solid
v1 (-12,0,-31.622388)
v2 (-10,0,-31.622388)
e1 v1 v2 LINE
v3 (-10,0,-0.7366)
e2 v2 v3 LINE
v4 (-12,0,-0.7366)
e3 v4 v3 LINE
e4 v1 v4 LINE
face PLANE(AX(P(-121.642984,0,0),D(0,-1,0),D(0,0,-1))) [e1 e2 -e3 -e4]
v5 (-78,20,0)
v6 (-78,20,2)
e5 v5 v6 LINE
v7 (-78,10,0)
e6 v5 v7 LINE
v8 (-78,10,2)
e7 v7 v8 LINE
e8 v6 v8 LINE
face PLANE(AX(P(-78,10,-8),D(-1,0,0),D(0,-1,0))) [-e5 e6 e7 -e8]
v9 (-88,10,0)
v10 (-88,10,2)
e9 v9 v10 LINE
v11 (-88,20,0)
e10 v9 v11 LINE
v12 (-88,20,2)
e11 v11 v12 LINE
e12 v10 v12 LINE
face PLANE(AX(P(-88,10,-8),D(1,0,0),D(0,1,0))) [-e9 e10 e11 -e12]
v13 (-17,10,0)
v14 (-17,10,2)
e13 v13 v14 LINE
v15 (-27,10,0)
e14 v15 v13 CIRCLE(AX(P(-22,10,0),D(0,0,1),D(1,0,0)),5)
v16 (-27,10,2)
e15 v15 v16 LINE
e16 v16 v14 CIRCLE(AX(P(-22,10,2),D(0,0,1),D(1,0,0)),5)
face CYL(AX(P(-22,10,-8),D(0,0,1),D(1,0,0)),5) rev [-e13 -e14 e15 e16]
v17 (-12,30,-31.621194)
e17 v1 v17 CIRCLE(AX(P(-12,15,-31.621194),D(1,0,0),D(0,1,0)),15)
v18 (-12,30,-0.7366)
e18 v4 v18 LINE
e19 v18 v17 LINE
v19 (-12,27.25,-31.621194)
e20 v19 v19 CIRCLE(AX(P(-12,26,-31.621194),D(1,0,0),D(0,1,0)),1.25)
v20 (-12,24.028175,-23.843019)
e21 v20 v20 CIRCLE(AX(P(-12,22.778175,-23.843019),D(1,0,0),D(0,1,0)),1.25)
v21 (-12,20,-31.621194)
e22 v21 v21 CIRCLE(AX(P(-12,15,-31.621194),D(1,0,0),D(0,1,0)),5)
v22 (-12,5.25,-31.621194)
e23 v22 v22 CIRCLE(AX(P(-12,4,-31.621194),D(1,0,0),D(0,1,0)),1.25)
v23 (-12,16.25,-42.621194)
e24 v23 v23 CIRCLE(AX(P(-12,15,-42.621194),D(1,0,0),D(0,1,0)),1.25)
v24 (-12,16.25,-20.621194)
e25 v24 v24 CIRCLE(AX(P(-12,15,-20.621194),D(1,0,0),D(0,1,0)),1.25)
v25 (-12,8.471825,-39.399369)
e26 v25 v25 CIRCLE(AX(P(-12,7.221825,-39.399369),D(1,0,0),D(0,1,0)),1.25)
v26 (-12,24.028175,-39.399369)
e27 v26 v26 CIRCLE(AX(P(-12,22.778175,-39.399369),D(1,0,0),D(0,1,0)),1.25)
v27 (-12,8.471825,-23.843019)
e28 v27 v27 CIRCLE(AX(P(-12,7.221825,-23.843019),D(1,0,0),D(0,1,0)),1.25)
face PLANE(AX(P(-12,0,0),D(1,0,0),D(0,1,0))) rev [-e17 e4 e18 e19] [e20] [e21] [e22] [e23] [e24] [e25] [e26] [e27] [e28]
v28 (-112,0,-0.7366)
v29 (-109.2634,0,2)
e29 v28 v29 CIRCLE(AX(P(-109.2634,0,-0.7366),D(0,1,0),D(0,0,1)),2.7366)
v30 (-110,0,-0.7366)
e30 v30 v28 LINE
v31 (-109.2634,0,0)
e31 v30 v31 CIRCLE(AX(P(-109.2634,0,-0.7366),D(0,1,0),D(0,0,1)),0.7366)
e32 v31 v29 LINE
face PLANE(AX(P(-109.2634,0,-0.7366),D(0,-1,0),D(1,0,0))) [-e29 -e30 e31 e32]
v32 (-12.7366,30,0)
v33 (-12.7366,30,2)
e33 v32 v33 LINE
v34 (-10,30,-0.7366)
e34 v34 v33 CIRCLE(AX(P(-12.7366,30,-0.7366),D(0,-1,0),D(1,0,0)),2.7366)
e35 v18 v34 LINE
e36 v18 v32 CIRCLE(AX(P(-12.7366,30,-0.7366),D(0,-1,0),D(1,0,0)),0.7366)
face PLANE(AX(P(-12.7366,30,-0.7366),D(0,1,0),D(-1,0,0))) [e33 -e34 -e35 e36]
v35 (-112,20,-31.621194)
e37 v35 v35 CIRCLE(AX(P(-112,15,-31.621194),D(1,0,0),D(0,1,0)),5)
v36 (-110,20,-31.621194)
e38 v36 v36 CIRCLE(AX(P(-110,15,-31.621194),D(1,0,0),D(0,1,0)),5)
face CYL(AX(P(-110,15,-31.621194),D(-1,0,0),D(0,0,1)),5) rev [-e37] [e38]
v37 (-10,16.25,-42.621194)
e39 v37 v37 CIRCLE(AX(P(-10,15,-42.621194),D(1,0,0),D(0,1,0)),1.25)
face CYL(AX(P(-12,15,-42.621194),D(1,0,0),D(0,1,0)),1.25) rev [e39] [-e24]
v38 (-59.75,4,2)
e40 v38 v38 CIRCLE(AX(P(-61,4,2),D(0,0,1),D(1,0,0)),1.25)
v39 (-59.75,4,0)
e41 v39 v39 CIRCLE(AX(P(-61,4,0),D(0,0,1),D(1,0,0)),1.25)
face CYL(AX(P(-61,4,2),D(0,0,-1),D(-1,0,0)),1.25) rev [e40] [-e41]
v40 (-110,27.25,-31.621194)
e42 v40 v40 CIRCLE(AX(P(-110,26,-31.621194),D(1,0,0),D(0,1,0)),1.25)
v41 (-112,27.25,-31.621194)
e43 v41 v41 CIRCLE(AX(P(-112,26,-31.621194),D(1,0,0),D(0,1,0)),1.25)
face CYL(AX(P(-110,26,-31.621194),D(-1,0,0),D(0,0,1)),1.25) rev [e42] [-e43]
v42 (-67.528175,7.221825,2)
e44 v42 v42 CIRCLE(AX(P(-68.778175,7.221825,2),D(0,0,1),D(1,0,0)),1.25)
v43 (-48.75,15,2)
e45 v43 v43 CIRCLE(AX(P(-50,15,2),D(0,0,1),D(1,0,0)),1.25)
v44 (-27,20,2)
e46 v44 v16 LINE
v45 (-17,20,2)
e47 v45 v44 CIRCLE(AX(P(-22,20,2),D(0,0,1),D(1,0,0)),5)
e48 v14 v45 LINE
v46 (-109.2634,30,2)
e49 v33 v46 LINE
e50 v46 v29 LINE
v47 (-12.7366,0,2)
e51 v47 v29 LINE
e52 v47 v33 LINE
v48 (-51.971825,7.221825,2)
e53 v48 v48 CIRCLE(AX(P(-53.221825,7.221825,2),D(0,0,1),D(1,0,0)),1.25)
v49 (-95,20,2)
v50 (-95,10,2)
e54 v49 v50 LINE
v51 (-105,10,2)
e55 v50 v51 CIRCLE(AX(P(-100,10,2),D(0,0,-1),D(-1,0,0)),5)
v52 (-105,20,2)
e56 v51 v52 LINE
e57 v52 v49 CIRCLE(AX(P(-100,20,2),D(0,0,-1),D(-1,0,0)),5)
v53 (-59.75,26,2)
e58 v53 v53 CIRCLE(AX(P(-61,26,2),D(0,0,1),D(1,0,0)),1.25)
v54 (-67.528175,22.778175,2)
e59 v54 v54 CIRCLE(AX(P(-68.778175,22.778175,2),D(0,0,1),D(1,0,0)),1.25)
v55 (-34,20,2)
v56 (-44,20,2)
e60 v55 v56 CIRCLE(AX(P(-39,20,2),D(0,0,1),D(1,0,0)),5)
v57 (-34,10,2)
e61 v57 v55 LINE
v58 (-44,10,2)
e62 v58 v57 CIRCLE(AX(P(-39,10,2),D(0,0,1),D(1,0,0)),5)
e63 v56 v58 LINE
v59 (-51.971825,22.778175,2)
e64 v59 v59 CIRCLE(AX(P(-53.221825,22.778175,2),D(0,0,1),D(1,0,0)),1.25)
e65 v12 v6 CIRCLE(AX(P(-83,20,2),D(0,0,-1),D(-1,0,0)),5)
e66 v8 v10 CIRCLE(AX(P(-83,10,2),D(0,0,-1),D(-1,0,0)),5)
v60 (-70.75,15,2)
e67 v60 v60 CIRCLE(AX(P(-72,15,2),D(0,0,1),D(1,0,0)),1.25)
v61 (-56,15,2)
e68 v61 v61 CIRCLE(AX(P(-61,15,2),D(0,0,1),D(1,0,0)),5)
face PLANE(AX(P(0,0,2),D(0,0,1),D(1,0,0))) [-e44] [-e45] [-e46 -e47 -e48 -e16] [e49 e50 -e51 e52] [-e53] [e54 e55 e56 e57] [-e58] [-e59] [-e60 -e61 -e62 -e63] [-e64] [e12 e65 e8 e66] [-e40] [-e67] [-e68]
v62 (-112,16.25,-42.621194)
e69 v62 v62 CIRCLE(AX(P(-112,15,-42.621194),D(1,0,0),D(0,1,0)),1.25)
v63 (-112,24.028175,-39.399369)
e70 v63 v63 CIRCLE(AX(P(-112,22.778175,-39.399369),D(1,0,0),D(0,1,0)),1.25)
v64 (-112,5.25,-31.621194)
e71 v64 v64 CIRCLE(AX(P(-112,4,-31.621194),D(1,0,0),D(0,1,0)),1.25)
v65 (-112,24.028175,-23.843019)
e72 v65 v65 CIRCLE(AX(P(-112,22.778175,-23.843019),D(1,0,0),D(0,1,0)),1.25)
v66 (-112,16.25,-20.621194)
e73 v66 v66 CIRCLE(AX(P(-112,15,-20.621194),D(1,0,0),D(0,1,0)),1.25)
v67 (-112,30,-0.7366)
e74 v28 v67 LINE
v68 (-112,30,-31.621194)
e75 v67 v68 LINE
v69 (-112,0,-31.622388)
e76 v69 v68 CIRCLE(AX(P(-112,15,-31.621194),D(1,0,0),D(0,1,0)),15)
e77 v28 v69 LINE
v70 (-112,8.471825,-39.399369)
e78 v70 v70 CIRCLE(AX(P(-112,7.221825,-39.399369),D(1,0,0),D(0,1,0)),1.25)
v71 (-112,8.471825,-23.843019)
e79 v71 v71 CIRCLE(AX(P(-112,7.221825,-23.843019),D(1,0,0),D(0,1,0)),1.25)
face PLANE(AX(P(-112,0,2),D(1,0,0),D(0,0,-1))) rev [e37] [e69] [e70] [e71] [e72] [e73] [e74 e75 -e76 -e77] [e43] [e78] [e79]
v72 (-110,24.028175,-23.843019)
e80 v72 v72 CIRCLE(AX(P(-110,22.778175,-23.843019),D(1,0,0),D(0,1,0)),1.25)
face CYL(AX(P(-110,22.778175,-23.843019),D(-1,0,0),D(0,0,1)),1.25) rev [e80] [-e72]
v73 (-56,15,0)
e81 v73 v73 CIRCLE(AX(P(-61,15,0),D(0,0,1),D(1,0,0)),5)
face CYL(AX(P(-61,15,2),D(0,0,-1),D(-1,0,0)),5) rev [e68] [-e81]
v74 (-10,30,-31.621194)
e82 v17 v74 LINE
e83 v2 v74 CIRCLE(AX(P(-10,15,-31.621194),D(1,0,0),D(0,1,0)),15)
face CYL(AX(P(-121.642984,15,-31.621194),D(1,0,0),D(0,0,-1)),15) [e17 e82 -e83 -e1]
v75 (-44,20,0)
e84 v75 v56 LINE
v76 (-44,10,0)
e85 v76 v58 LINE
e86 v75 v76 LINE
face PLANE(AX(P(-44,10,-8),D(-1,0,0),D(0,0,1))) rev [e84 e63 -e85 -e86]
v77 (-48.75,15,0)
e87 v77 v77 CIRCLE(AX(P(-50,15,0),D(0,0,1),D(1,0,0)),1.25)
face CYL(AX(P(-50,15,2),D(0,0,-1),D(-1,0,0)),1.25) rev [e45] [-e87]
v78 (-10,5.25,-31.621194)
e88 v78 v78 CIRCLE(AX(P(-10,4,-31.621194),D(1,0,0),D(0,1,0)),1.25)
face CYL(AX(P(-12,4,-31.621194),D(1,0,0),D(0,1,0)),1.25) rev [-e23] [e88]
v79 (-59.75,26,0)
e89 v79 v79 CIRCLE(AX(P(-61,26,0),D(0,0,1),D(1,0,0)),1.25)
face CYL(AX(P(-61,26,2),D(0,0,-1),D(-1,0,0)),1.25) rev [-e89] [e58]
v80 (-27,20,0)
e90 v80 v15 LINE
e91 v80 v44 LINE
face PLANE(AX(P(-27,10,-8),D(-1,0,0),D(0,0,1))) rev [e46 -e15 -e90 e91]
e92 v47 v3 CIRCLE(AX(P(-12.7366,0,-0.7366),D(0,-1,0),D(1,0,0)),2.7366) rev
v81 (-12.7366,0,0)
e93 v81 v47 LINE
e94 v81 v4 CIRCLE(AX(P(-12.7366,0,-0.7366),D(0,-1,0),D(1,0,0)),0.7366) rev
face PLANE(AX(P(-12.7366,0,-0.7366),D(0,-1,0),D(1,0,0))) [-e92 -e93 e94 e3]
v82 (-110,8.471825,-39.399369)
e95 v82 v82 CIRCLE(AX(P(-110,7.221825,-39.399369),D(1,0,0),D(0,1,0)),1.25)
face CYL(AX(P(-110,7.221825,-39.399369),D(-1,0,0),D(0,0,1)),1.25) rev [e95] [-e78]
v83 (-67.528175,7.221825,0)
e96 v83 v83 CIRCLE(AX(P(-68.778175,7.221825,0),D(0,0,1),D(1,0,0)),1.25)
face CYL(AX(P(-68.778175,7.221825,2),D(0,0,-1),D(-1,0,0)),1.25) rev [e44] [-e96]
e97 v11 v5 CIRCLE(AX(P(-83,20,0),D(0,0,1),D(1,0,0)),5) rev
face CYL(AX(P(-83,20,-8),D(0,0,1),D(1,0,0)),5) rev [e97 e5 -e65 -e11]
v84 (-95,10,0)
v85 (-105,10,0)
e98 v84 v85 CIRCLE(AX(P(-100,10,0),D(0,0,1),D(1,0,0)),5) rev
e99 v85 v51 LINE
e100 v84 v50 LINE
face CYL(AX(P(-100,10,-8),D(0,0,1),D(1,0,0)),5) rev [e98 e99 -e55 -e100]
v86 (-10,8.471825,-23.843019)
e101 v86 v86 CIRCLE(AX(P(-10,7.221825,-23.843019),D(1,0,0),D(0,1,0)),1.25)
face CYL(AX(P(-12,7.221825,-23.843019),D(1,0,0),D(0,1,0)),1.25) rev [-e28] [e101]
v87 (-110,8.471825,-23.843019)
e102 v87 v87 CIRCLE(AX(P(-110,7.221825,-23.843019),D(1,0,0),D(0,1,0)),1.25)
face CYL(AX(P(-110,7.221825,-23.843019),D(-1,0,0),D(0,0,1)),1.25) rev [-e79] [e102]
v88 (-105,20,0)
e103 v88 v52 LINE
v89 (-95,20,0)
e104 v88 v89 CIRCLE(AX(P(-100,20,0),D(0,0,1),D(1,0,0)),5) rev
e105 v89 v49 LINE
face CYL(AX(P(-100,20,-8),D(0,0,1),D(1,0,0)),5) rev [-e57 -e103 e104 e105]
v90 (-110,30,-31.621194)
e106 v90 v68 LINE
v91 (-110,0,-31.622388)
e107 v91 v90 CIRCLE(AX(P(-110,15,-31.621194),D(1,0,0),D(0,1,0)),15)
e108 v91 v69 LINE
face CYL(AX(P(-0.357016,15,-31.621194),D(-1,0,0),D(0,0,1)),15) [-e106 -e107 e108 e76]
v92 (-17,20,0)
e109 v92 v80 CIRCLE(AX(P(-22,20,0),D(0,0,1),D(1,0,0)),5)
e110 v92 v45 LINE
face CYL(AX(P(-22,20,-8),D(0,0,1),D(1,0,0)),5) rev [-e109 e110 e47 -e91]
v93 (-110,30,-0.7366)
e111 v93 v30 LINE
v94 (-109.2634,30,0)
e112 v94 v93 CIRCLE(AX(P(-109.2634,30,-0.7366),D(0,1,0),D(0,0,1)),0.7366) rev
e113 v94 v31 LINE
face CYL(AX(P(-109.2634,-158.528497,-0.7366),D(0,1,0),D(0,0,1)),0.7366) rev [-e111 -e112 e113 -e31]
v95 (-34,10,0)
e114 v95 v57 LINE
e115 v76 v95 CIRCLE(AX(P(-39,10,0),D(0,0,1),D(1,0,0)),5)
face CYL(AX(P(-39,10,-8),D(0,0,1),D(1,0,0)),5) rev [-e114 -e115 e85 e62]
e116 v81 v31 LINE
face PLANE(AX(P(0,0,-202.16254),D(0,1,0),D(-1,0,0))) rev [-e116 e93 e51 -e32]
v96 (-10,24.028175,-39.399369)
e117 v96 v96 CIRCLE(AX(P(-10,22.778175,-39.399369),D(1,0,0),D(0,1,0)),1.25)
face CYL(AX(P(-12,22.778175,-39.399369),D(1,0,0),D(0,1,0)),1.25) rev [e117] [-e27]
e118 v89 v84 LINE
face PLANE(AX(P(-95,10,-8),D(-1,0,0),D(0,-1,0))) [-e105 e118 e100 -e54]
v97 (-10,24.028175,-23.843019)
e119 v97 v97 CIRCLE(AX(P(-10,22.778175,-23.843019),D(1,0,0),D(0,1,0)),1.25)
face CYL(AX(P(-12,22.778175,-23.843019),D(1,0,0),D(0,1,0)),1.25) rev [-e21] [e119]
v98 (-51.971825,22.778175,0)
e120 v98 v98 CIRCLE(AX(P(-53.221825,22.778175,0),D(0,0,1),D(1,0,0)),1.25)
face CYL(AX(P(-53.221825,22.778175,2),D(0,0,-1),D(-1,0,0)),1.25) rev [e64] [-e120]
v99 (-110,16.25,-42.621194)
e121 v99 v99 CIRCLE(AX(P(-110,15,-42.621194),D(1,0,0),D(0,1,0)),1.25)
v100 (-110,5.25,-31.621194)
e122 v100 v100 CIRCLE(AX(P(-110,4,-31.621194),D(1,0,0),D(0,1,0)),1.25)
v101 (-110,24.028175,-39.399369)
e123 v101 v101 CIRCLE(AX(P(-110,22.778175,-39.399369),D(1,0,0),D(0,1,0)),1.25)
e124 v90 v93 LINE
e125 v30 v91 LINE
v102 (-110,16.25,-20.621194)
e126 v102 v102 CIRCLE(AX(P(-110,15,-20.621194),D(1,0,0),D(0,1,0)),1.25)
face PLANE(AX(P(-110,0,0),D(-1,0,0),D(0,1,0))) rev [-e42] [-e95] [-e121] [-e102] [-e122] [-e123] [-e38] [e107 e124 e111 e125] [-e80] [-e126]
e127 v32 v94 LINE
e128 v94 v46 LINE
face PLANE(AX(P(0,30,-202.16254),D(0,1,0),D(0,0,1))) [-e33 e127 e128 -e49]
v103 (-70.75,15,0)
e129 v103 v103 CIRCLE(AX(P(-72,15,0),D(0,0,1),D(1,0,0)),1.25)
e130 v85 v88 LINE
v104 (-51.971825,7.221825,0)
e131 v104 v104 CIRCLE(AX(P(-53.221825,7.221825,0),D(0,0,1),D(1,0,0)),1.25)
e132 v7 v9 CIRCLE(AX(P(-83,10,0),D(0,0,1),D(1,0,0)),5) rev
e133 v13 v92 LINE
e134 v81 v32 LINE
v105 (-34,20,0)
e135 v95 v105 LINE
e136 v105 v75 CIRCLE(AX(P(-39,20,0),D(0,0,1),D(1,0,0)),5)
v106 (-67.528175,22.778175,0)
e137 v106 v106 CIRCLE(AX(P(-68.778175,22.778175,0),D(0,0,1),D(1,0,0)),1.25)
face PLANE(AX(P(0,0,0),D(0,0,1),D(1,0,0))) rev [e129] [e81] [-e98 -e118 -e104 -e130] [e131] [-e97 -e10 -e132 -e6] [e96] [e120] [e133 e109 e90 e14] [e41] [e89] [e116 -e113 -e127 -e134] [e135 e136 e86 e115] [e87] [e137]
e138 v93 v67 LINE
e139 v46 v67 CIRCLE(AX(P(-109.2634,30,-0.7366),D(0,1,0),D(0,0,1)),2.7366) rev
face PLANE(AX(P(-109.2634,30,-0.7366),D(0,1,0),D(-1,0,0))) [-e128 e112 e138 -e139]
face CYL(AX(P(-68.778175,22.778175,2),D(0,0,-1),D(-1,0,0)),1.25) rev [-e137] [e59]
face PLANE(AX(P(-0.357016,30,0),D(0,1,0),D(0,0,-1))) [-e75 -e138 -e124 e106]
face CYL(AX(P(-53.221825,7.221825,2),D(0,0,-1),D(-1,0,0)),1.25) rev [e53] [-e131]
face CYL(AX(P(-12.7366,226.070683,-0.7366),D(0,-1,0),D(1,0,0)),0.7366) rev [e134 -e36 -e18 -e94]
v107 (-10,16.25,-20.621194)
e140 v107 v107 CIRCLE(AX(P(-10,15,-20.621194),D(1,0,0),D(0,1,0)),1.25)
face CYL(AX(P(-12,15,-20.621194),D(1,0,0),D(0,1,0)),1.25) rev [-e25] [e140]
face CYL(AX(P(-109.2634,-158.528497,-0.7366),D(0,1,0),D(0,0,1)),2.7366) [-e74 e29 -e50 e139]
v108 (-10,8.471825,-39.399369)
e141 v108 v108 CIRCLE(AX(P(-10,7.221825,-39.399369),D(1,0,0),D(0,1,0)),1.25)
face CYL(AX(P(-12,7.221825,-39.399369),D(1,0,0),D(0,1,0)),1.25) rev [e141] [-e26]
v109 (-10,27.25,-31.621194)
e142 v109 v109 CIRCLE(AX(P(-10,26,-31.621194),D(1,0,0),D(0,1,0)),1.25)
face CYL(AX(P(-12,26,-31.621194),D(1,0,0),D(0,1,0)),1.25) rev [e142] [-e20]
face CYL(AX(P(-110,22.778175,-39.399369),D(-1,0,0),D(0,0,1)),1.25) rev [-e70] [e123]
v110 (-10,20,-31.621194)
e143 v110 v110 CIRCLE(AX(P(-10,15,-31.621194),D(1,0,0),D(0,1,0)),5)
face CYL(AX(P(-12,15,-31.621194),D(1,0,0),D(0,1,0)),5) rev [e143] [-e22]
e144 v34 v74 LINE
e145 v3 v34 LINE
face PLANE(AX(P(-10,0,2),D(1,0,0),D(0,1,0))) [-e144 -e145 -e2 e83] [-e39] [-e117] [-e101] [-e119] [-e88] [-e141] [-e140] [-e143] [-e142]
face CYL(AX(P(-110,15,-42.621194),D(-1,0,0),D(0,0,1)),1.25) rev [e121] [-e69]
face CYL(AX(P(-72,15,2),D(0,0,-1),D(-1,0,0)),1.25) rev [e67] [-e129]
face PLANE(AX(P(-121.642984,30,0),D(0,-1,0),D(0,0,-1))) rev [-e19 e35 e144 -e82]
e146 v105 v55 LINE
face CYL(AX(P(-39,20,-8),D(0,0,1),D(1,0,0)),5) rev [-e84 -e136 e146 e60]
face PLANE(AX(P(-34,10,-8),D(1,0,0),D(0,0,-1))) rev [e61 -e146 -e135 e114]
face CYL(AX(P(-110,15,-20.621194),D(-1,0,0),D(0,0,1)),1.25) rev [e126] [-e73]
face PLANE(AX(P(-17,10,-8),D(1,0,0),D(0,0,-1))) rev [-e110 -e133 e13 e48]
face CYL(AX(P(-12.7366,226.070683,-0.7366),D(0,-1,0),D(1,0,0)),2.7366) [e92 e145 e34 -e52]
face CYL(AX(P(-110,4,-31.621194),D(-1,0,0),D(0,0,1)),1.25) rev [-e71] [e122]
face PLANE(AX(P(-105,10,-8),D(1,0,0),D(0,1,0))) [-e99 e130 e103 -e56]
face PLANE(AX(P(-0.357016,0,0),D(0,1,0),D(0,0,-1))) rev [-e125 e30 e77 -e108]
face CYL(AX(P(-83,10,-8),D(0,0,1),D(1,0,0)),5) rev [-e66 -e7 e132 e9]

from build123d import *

# Parameters (mm, degrees)
ESBO_O1_W                        = 102
ESBO_O1_H                        = 30
ESBO_O1_R                        = 5
ESBO_O1_R_2                      = 1.25
RESSALTO_EXTRUS_O1_DEPTH         = 2
ESBO_O12_R                       = 1.25
RESSALTO_EXTRUS_O2_DEPTH         = 2
PLANIFICAR_DOBRAS1_START         = -48
PLANIFICAR_DOBRAS1_OUTLINE_W     = 2
PLANIFICAR_DOBRAS1_OUTLINE_H     = 30
PLANIFICAR_DOBRAS1_DEPTH         = 48
PLANIFICAR_DOBRAS1_2_OUTLINE_R   = 1.25
PLANIFICAR_DOBRAS1_2_OUTLINE_R_2 = 5
PLANIFICAR_DOBRAS1_2_DEPTH       = 2
PROCESSAR_DOBRAS1_START          = -159
PROCESSAR_DOBRAS1_OUTLINE_W      = 30
PROCESSAR_DOBRAS1_OUTLINE_H      = 2
PROCESSAR_DOBRAS1_DEPTH          = 49.7366
PROCESSAR_DOBRAS1_START_2        = -12.7366
PROCESSAR_DOBRAS1_2_OUTLINE_W    = 30
PROCESSAR_DOBRAS1_2_OUTLINE_H    = 2
PROCESSAR_DOBRAS1_2_DEPTH        = 49.7366
PROCESSAR_DOBRAS1_START_3        = -111.733838284
PROCESSAR_DOBRAS1_3_OUTLINE_R    = 1.25
PROCESSAR_DOBRAS1_3_OUTLINE_R_2  = 5
PROCESSAR_DOBRAS1_3_DEPTH        = 1.733838284
PROCESSAR_DOBRAS1_START_4        = -12
PROCESSAR_DOBRAS1_4_OUTLINE_R    = 1.25
PROCESSAR_DOBRAS1_4_OUTLINE_R_2  = 5
PROCESSAR_DOBRAS1_4_DEPTH        = 1.733838284
PROCESSAR_DOBRAS1_START_5        = -112
PROCESSAR_DOBRAS1_5_OUTLINE_R    = 1.25
PROCESSAR_DOBRAS1_5_OUTLINE_R_2  = 5
PROCESSAR_DOBRAS1_5_DEPTH        = 2.7366
PROCESSAR_DOBRAS1_6_OUTLINE_R    = 1.25
PROCESSAR_DOBRAS1_6_OUTLINE_R_2  = 5
PROCESSAR_DOBRAS1_6_DEPTH        = 2.7366
PROCESSAR_DOBRAS1_7_DEPTH        = 30
PROCESSAR_DOBRAS1_8_DEPTH        = 30
CORTE_EXTRUS_O1_DEPTH            = 10


with BuildPart() as part:
    # Esboço1 → Ressalto-extrusão1 (new body)
    with BuildSketch(Plane.XY):
        with Locations((-61, 15)):
            Rectangle(ESBO_O1_W, ESBO_O1_H)
        with Locations((-61, 15)):
            Circle(ESBO_O1_R, mode=Mode.SUBTRACT)
        with Locations((-72, 15)):
            Circle(ESBO_O1_R_2, mode=Mode.SUBTRACT)
        with Locations((-68.778174593, 22.778174593)):
            Circle(ESBO_O1_R_2, mode=Mode.SUBTRACT)
        with Locations((-61, 26)):
            Circle(ESBO_O1_R_2, mode=Mode.SUBTRACT)
        with Locations((-53.221825407, 22.778174593)):
            Circle(ESBO_O1_R_2, mode=Mode.SUBTRACT)
        with Locations((-50, 15)):
            Circle(ESBO_O1_R_2, mode=Mode.SUBTRACT)
        with Locations((-53.221825407, 7.221825407)):
            Circle(ESBO_O1_R_2, mode=Mode.SUBTRACT)
        with Locations((-61, 4)):
            Circle(ESBO_O1_R_2, mode=Mode.SUBTRACT)
        with Locations((-68.778174593, 7.221825407)):
            Circle(ESBO_O1_R_2, mode=Mode.SUBTRACT)
    extrude(amount=RESSALTO_EXTRUS_O1_DEPTH)

    # Esboço12 → Ressalto-extrusão2 (add)
    with BuildSketch(Plane(origin=(-10, 0, 0), x_dir=(0, 0, -1), z_dir=(1, 0, 0))):
        with BuildLine():
            Line((0, 30), (0, 0))
            Line((0, 0), (8, 0))
            Line((8, 0), (31.622387861, 0))
            ThreePointArc((31.622387861, 0), (46.621193931, 15.001193931), (31.62, 30))
            Line((31.62, 30), (18, 30))
            Line((18, 30), (0, 30))
        make_face()
        with Locations(Location((23.843019338, 7.221825407, 0), (0, 0, 90))):
            Circle(ESBO_O12_R, mode=Mode.SUBTRACT)
        with Locations(Location((20.621193931, 15, 0), (0, 0, 90))):
            Circle(ESBO_O12_R, mode=Mode.SUBTRACT)
        with Locations(Location((31.621193931, 4, 0), (0, 0, 90))):
            Circle(ESBO_O12_R, mode=Mode.SUBTRACT)
        with Locations(Location((39.399368524, 7.221825407, 0), (0, 0, 90))):
            Circle(ESBO_O12_R, mode=Mode.SUBTRACT)
        with Locations(Location((23.843019338, 22.778174593, 0), (0, 0, 90))):
            Circle(ESBO_O12_R, mode=Mode.SUBTRACT)
        with BuildLine():
            ThreePointArc((28.085660025, 11.464466094), (28.085660025, 18.535533906), (35.156727837, 18.535533906))
            ThreePointArc((35.156727837, 18.535533906), (35.156727837, 11.464466094), (28.085660025, 11.464466094))
        make_face(mode=Mode.SUBTRACT)
        with Locations(Location((42.621193931, 15, 0), (0, 0, 90))):
            Circle(ESBO_O12_R, mode=Mode.SUBTRACT)
        with Locations(Location((31.621193931, 26, 0), (0, 0, 90))):
            Circle(ESBO_O12_R, mode=Mode.SUBTRACT)
        with Locations(Location((39.399368524, 22.778174593, 0), (0, 0, 90))):
            Circle(ESBO_O12_R, mode=Mode.SUBTRACT)
    ressalto_extrus_o2 = extrude(amount=-RESSALTO_EXTRUS_O2_DEPTH)

    # Espelhar1: Ressalto-extrusão2 across plane
    add(ressalto_extrus_o2.mirror(Plane.ZY.offset(61)))

    # Planificar-Dobras1: read off the stored shape, not the designer's step
    # Planificar-Dobras1 outline → Planificar-Dobras1 (cut)
    with BuildSketch(Plane.XY.offset(PLANIFICAR_DOBRAS1_START)):
        with Locations((-11, 15)):
            Rectangle(PLANIFICAR_DOBRAS1_OUTLINE_W, PLANIFICAR_DOBRAS1_OUTLINE_H)
        with Locations((-111, 15)):
            Rectangle(PLANIFICAR_DOBRAS1_OUTLINE_W, PLANIFICAR_DOBRAS1_OUTLINE_H)
    extrude(amount=PLANIFICAR_DOBRAS1_DEPTH, mode=Mode.SUBTRACT)

    # Planificar-Dobras1 2 outline → Planificar-Dobras1 2 (add)
    # profile 1 of 2: a face of its own
    with BuildSketch(Plane.XY):
        with BuildLine():
            Line((-10, 30), (-10, 0))
            Line((-10, 0), (20.877032763, 0))
            ThreePointArc((20.877032763, 0), (35.875838867, 15.000596966), (20.875838832, 30.000000048))
            Line((20.875838832, 30.000000048), (-10, 30))
        make_face()
        with Locations((20.875838832, 4)):
            Circle(PLANIFICAR_DOBRAS1_2_OUTLINE_R, mode=Mode.SUBTRACT)
        with Locations((13.097664239, 7.221825407)):
            Circle(PLANIFICAR_DOBRAS1_2_OUTLINE_R, mode=Mode.SUBTRACT)
        with Locations((28.654013425, 7.221825407)):
            Circle(PLANIFICAR_DOBRAS1_2_OUTLINE_R, mode=Mode.SUBTRACT)
        with Locations((9.875838832, 15)):
            Circle(PLANIFICAR_DOBRAS1_2_OUTLINE_R, mode=Mode.SUBTRACT)
        with Locations((20.875838832, 15)):
            Circle(PLANIFICAR_DOBRAS1_2_OUTLINE_R_2, mode=Mode.SUBTRACT)
        with Locations((31.875838832, 15)):
            Circle(PLANIFICAR_DOBRAS1_2_OUTLINE_R, mode=Mode.SUBTRACT)
        with Locations((13.097664239, 22.778174593)):
            Circle(PLANIFICAR_DOBRAS1_2_OUTLINE_R, mode=Mode.SUBTRACT)
        with Locations((28.654013425, 22.778174593)):
            Circle(PLANIFICAR_DOBRAS1_2_OUTLINE_R, mode=Mode.SUBTRACT)
        with Locations((20.875838832, 26)):
            Circle(PLANIFICAR_DOBRAS1_2_OUTLINE_R, mode=Mode.SUBTRACT)
    # profile 2 of 2: a face of its own
    with BuildSketch(Plane.XY):
        with BuildLine():
            Line((-142.877032763, 0), (-112, 0))
            Line((-112, 0), (-112, 30))
            Line((-112, 30), (-142.875838832, 30.000000048))
            ThreePointArc((-142.875838832, 30.000000048), (-157.875838867, 15.000596966), (-142.877032763, 0))
        make_face()
        with Locations((-142.875838832, 4)):
            Circle(PLANIFICAR_DOBRAS1_2_OUTLINE_R, mode=Mode.SUBTRACT)
        with Locations((-150.654013425, 7.221825407)):
            Circle(PLANIFICAR_DOBRAS1_2_OUTLINE_R, mode=Mode.SUBTRACT)
        with Locations((-135.097664239, 7.221825407)):
            Circle(PLANIFICAR_DOBRAS1_2_OUTLINE_R, mode=Mode.SUBTRACT)
        with Locations((-153.875838832, 15)):
            Circle(PLANIFICAR_DOBRAS1_2_OUTLINE_R, mode=Mode.SUBTRACT)
        with Locations((-142.875838832, 15)):
            Circle(PLANIFICAR_DOBRAS1_2_OUTLINE_R_2, mode=Mode.SUBTRACT)
        with Locations((-131.875838832, 15)):
            Circle(PLANIFICAR_DOBRAS1_2_OUTLINE_R, mode=Mode.SUBTRACT)
        with Locations((-150.654013425, 22.778174593)):
            Circle(PLANIFICAR_DOBRAS1_2_OUTLINE_R, mode=Mode.SUBTRACT)
        with Locations((-135.097664239, 22.778174593)):
            Circle(PLANIFICAR_DOBRAS1_2_OUTLINE_R, mode=Mode.SUBTRACT)
        with Locations((-142.875838832, 26)):
            Circle(PLANIFICAR_DOBRAS1_2_OUTLINE_R, mode=Mode.SUBTRACT)
    extrude(amount=PLANIFICAR_DOBRAS1_2_DEPTH)

    # Processar-Dobras1: read off the stored shape, not the designer's step
    # Processar-Dobras1 outline → Processar-Dobras1 (cut)
    with BuildSketch(Plane.YZ.offset(PROCESSAR_DOBRAS1_START)):
        with Locations((15, 1)):
            Rectangle(PROCESSAR_DOBRAS1_OUTLINE_W, PROCESSAR_DOBRAS1_OUTLINE_H)
    extrude(amount=PROCESSAR_DOBRAS1_DEPTH, mode=Mode.SUBTRACT)

    # Processar-Dobras1 2 outline → Processar-Dobras1 2 (cut)
    with BuildSketch(Plane.YZ.offset(PROCESSAR_DOBRAS1_START_2)):
        with Locations((15, 1)):
            Rectangle(PROCESSAR_DOBRAS1_2_OUTLINE_W, PROCESSAR_DOBRAS1_2_OUTLINE_H)
    extrude(amount=PROCESSAR_DOBRAS1_2_DEPTH, mode=Mode.SUBTRACT)



with BuildPart() as body_2:
    # Processar-Dobras1 3 outline → Processar-Dobras1 3 (new body)
    with BuildSketch(Plane.YZ.offset(PROCESSAR_DOBRAS1_START_3)):
        with BuildLine():
            ThreePointArc((0, -31.622387861), (15.000596965, -46.621193966), (30.000000048, -31.621193931))
            Line((30.000000048, -31.621193931), (30, 0))
            Line((30, 0), (0, 0))
            Line((0, 0), (0, -31.622387861))
        make_face()
        with Locations((7.221825407, -39.399368524)):
            Circle(PROCESSAR_DOBRAS1_3_OUTLINE_R, mode=Mode.SUBTRACT)
        with Locations((15, -42.621193931)):
            Circle(PROCESSAR_DOBRAS1_3_OUTLINE_R, mode=Mode.SUBTRACT)
        with Locations((4, -31.621193931)):
            Circle(PROCESSAR_DOBRAS1_3_OUTLINE_R, mode=Mode.SUBTRACT)
        with Locations((7.221825407, -23.843019338)):
            Circle(PROCESSAR_DOBRAS1_3_OUTLINE_R, mode=Mode.SUBTRACT)
        with Locations((15, -31.621193931)):
            Circle(PROCESSAR_DOBRAS1_3_OUTLINE_R_2, mode=Mode.SUBTRACT)
        with Locations((22.778174593, -39.399368524)):
            Circle(PROCESSAR_DOBRAS1_3_OUTLINE_R, mode=Mode.SUBTRACT)
        with Locations((26, -31.621193931)):
            Circle(PROCESSAR_DOBRAS1_3_OUTLINE_R, mode=Mode.SUBTRACT)
        with Locations((22.778174593, -23.843019338)):
            Circle(PROCESSAR_DOBRAS1_3_OUTLINE_R, mode=Mode.SUBTRACT)
        with Locations((15, -20.621193931)):
            Circle(PROCESSAR_DOBRAS1_3_OUTLINE_R, mode=Mode.SUBTRACT)
    extrude(amount=PROCESSAR_DOBRAS1_3_DEPTH)


with BuildPart() as body_3:
    # Processar-Dobras1 4 outline → Processar-Dobras1 4 (new body)
    with BuildSketch(Plane.YZ.offset(PROCESSAR_DOBRAS1_START_4)):
        with BuildLine():
            ThreePointArc((0, -31.622387861), (15.000596965, -46.621193966), (30.000000048, -31.621193931))
            Line((30.000000048, -31.621193931), (30, 0))
            Line((30, 0), (0, 0))
            Line((0, 0), (0, -31.622387861))
        make_face()
        with Locations((7.221825407, -39.399368524)):
            Circle(PROCESSAR_DOBRAS1_4_OUTLINE_R, mode=Mode.SUBTRACT)
        with Locations((15, -42.621193931)):
            Circle(PROCESSAR_DOBRAS1_4_OUTLINE_R, mode=Mode.SUBTRACT)
        with Locations((4, -31.621193931)):
            Circle(PROCESSAR_DOBRAS1_4_OUTLINE_R, mode=Mode.SUBTRACT)
        with Locations((7.221825407, -23.843019338)):
            Circle(PROCESSAR_DOBRAS1_4_OUTLINE_R, mode=Mode.SUBTRACT)
        with Locations((15, -31.621193931)):
            Circle(PROCESSAR_DOBRAS1_4_OUTLINE_R_2, mode=Mode.SUBTRACT)
        with Locations((22.778174593, -39.399368524)):
            Circle(PROCESSAR_DOBRAS1_4_OUTLINE_R, mode=Mode.SUBTRACT)
        with Locations((26, -31.621193931)):
            Circle(PROCESSAR_DOBRAS1_4_OUTLINE_R, mode=Mode.SUBTRACT)
        with Locations((22.778174593, -23.843019338)):
            Circle(PROCESSAR_DOBRAS1_4_OUTLINE_R, mode=Mode.SUBTRACT)
        with Locations((15, -20.621193931)):
            Circle(PROCESSAR_DOBRAS1_4_OUTLINE_R, mode=Mode.SUBTRACT)
    extrude(amount=PROCESSAR_DOBRAS1_4_DEPTH)


with BuildPart() as part_1:
    add(part.part)

    add(body_2.part)  # Processar-Dobras1 5 merges body 2
    # Processar-Dobras1 5 outline → Processar-Dobras1 5 (add)
    with BuildSketch(Plane.YZ.offset(PROCESSAR_DOBRAS1_START_5)):
        with BuildLine():
            ThreePointArc((0, -31.622387861), (15.000596965, -46.621193966), (30.000000048, -31.621193931))
            Line((30.000000048, -31.621193931), (30, 0))
            Line((30, 0), (0, 0))
            Line((0, 0), (0, -31.622387861))
        make_face()
        with Locations((7.221825407, -39.399368524)):
            Circle(PROCESSAR_DOBRAS1_5_OUTLINE_R, mode=Mode.SUBTRACT)
        with Locations((15, -42.621193931)):
            Circle(PROCESSAR_DOBRAS1_5_OUTLINE_R, mode=Mode.SUBTRACT)
        with Locations((4, -31.621193931)):
            Circle(PROCESSAR_DOBRAS1_5_OUTLINE_R, mode=Mode.SUBTRACT)
        with Locations((7.221825407, -23.843019338)):
            Circle(PROCESSAR_DOBRAS1_5_OUTLINE_R, mode=Mode.SUBTRACT)
        with Locations((15, -31.621193931)):
            Circle(PROCESSAR_DOBRAS1_5_OUTLINE_R_2, mode=Mode.SUBTRACT)
        with Locations((22.778174593, -39.399368524)):
            Circle(PROCESSAR_DOBRAS1_5_OUTLINE_R, mode=Mode.SUBTRACT)
        with Locations((26, -31.621193931)):
            Circle(PROCESSAR_DOBRAS1_5_OUTLINE_R, mode=Mode.SUBTRACT)
        with Locations((22.778174593, -23.843019338)):
            Circle(PROCESSAR_DOBRAS1_5_OUTLINE_R, mode=Mode.SUBTRACT)
        with Locations((15, -20.621193931)):
            Circle(PROCESSAR_DOBRAS1_5_OUTLINE_R, mode=Mode.SUBTRACT)
    extrude(amount=PROCESSAR_DOBRAS1_5_DEPTH)


    add(body_3.part)  # Processar-Dobras1 6 merges body 3
    # Processar-Dobras1 6 outline → Processar-Dobras1 6 (add)
    with BuildSketch(Plane.YZ.offset(PROCESSAR_DOBRAS1_START_2)):
        with BuildLine():
            ThreePointArc((0, -31.622387861), (15.000596965, -46.621193966), (30.000000048, -31.621193931))
            Line((30.000000048, -31.621193931), (30, 0))
            Line((30, 0), (0, 0))
            Line((0, 0), (0, -31.622387861))
        make_face()
        with Locations((7.221825407, -39.399368524)):
            Circle(PROCESSAR_DOBRAS1_6_OUTLINE_R, mode=Mode.SUBTRACT)
        with Locations((15, -42.621193931)):
            Circle(PROCESSAR_DOBRAS1_6_OUTLINE_R, mode=Mode.SUBTRACT)
        with Locations((4, -31.621193931)):
            Circle(PROCESSAR_DOBRAS1_6_OUTLINE_R, mode=Mode.SUBTRACT)
        with Locations((7.221825407, -23.843019338)):
            Circle(PROCESSAR_DOBRAS1_6_OUTLINE_R, mode=Mode.SUBTRACT)
        with Locations((15, -31.621193931)):
            Circle(PROCESSAR_DOBRAS1_6_OUTLINE_R_2, mode=Mode.SUBTRACT)
        with Locations((22.778174593, -39.399368524)):
            Circle(PROCESSAR_DOBRAS1_6_OUTLINE_R, mode=Mode.SUBTRACT)
        with Locations((26, -31.621193931)):
            Circle(PROCESSAR_DOBRAS1_6_OUTLINE_R, mode=Mode.SUBTRACT)
        with Locations((22.778174593, -23.843019338)):
            Circle(PROCESSAR_DOBRAS1_6_OUTLINE_R, mode=Mode.SUBTRACT)
        with Locations((15, -20.621193931)):
            Circle(PROCESSAR_DOBRAS1_6_OUTLINE_R, mode=Mode.SUBTRACT)
    extrude(amount=PROCESSAR_DOBRAS1_6_DEPTH)

    # Processar-Dobras1 7 outline → Processar-Dobras1 7 (cut)
    with BuildSketch(Plane(origin=(0, 0, 0), x_dir=(1, 0, 0), z_dir=(0, 1, 0))):
        with BuildLine():
            Line((-110, 48), (-110, 0.7366))
            ThreePointArc((-110, 0.7366), (-109.784254855, 0.215745145), (-109.2634, 0))
            Line((-109.2634, 0), (-109.2634, 48))
            Line((-109.2634, 48), (-110, 48))
        make_face()
        with BuildLine():
            Line((-112, 0.7366), (-112.000000023, 48))
            Line((-112.000000023, 48), (-113, 48))
            Line((-113, 48), (-113, 0))
            Line((-113, 0), (-111.899002398, 0))
            ThreePointArc((-111.899002398, 0), (-111.974633029, 0.364854094), (-112, 0.7366))
        make_face()
        with BuildLine():
            Line((-12, 48), (-12.7366, 48))
            Line((-12.7366, 48), (-12.7366, 0))
            ThreePointArc((-12.7366, 0), (-12.215745145, 0.215745145), (-12, 0.7366))
            Line((-12, 0.7366), (-12, 48))
        make_face()
        with BuildLine():
            Line((-9, 48), (-9.999999977, 48))
            Line((-9.999999977, 48), (-10, 0.7366))
            ThreePointArc((-10, 0.7366), (-10.025366971, 0.364854094), (-10.100997602, 0))
            Line((-10.100997602, 0), (-9, 0))
            Line((-9, 0), (-9, 48))
        make_face()
    extrude(amount=PROCESSAR_DOBRAS1_7_DEPTH, mode=Mode.SUBTRACT)

    # Processar-Dobras1 8 outline → Processar-Dobras1 8 (add)
    with BuildSketch(Plane(origin=(0, 0, 0), x_dir=(1, 0, 0), z_dir=(0, 1, 0))):
        with BuildLine():
            Line((-109.2634, -2), (-109.2634, 0))
            Line((-109.2634, 0), (-111.899002398, 0))
            ThreePointArc((-111.899002398, 0), (-110.917667209, -1.443395312), (-109.2634, -2))
        make_face()
        with BuildLine():
            Line((-10.100997602, 0), (-12.7366, 0))
            Line((-12.7366, 0), (-12.7366, -2))
            ThreePointArc((-12.7366, -2), (-11.082332791, -1.443395312), (-10.100997602, 0))
        make_face()
    extrude(amount=PROCESSAR_DOBRAS1_8_DEPTH)

    # Esboço17 → Corte-extrusão1 (cut)
    with BuildSketch(Plane.XY.offset(2)):
        with BuildLine():
            Line((-27, 10), (-27, 20))
            ThreePointArc((-27, 20), (-22, 25), (-17, 20))
            Line((-17, 20), (-17, 10))
            ThreePointArc((-17, 10), (-22, 5), (-27, 10))
        make_face()
        with BuildLine():
            Line((-44, 10), (-44, 20))
            ThreePointArc((-44, 20), (-39, 25), (-34, 20))
            Line((-34, 20), (-34, 10))
            ThreePointArc((-34, 10), (-39, 5), (-44, 10))
        make_face()
    corte_extrus_o1 = extrude(amount=-CORTE_EXTRUS_O1_DEPTH, mode=Mode.SUBTRACT)

    # Espelhar2: Corte-extrusão1 across plane
    add(corte_extrus_o1.mirror(Plane.ZY.offset(61)), mode=Mode.SUBTRACT)


solid = part_1.part
